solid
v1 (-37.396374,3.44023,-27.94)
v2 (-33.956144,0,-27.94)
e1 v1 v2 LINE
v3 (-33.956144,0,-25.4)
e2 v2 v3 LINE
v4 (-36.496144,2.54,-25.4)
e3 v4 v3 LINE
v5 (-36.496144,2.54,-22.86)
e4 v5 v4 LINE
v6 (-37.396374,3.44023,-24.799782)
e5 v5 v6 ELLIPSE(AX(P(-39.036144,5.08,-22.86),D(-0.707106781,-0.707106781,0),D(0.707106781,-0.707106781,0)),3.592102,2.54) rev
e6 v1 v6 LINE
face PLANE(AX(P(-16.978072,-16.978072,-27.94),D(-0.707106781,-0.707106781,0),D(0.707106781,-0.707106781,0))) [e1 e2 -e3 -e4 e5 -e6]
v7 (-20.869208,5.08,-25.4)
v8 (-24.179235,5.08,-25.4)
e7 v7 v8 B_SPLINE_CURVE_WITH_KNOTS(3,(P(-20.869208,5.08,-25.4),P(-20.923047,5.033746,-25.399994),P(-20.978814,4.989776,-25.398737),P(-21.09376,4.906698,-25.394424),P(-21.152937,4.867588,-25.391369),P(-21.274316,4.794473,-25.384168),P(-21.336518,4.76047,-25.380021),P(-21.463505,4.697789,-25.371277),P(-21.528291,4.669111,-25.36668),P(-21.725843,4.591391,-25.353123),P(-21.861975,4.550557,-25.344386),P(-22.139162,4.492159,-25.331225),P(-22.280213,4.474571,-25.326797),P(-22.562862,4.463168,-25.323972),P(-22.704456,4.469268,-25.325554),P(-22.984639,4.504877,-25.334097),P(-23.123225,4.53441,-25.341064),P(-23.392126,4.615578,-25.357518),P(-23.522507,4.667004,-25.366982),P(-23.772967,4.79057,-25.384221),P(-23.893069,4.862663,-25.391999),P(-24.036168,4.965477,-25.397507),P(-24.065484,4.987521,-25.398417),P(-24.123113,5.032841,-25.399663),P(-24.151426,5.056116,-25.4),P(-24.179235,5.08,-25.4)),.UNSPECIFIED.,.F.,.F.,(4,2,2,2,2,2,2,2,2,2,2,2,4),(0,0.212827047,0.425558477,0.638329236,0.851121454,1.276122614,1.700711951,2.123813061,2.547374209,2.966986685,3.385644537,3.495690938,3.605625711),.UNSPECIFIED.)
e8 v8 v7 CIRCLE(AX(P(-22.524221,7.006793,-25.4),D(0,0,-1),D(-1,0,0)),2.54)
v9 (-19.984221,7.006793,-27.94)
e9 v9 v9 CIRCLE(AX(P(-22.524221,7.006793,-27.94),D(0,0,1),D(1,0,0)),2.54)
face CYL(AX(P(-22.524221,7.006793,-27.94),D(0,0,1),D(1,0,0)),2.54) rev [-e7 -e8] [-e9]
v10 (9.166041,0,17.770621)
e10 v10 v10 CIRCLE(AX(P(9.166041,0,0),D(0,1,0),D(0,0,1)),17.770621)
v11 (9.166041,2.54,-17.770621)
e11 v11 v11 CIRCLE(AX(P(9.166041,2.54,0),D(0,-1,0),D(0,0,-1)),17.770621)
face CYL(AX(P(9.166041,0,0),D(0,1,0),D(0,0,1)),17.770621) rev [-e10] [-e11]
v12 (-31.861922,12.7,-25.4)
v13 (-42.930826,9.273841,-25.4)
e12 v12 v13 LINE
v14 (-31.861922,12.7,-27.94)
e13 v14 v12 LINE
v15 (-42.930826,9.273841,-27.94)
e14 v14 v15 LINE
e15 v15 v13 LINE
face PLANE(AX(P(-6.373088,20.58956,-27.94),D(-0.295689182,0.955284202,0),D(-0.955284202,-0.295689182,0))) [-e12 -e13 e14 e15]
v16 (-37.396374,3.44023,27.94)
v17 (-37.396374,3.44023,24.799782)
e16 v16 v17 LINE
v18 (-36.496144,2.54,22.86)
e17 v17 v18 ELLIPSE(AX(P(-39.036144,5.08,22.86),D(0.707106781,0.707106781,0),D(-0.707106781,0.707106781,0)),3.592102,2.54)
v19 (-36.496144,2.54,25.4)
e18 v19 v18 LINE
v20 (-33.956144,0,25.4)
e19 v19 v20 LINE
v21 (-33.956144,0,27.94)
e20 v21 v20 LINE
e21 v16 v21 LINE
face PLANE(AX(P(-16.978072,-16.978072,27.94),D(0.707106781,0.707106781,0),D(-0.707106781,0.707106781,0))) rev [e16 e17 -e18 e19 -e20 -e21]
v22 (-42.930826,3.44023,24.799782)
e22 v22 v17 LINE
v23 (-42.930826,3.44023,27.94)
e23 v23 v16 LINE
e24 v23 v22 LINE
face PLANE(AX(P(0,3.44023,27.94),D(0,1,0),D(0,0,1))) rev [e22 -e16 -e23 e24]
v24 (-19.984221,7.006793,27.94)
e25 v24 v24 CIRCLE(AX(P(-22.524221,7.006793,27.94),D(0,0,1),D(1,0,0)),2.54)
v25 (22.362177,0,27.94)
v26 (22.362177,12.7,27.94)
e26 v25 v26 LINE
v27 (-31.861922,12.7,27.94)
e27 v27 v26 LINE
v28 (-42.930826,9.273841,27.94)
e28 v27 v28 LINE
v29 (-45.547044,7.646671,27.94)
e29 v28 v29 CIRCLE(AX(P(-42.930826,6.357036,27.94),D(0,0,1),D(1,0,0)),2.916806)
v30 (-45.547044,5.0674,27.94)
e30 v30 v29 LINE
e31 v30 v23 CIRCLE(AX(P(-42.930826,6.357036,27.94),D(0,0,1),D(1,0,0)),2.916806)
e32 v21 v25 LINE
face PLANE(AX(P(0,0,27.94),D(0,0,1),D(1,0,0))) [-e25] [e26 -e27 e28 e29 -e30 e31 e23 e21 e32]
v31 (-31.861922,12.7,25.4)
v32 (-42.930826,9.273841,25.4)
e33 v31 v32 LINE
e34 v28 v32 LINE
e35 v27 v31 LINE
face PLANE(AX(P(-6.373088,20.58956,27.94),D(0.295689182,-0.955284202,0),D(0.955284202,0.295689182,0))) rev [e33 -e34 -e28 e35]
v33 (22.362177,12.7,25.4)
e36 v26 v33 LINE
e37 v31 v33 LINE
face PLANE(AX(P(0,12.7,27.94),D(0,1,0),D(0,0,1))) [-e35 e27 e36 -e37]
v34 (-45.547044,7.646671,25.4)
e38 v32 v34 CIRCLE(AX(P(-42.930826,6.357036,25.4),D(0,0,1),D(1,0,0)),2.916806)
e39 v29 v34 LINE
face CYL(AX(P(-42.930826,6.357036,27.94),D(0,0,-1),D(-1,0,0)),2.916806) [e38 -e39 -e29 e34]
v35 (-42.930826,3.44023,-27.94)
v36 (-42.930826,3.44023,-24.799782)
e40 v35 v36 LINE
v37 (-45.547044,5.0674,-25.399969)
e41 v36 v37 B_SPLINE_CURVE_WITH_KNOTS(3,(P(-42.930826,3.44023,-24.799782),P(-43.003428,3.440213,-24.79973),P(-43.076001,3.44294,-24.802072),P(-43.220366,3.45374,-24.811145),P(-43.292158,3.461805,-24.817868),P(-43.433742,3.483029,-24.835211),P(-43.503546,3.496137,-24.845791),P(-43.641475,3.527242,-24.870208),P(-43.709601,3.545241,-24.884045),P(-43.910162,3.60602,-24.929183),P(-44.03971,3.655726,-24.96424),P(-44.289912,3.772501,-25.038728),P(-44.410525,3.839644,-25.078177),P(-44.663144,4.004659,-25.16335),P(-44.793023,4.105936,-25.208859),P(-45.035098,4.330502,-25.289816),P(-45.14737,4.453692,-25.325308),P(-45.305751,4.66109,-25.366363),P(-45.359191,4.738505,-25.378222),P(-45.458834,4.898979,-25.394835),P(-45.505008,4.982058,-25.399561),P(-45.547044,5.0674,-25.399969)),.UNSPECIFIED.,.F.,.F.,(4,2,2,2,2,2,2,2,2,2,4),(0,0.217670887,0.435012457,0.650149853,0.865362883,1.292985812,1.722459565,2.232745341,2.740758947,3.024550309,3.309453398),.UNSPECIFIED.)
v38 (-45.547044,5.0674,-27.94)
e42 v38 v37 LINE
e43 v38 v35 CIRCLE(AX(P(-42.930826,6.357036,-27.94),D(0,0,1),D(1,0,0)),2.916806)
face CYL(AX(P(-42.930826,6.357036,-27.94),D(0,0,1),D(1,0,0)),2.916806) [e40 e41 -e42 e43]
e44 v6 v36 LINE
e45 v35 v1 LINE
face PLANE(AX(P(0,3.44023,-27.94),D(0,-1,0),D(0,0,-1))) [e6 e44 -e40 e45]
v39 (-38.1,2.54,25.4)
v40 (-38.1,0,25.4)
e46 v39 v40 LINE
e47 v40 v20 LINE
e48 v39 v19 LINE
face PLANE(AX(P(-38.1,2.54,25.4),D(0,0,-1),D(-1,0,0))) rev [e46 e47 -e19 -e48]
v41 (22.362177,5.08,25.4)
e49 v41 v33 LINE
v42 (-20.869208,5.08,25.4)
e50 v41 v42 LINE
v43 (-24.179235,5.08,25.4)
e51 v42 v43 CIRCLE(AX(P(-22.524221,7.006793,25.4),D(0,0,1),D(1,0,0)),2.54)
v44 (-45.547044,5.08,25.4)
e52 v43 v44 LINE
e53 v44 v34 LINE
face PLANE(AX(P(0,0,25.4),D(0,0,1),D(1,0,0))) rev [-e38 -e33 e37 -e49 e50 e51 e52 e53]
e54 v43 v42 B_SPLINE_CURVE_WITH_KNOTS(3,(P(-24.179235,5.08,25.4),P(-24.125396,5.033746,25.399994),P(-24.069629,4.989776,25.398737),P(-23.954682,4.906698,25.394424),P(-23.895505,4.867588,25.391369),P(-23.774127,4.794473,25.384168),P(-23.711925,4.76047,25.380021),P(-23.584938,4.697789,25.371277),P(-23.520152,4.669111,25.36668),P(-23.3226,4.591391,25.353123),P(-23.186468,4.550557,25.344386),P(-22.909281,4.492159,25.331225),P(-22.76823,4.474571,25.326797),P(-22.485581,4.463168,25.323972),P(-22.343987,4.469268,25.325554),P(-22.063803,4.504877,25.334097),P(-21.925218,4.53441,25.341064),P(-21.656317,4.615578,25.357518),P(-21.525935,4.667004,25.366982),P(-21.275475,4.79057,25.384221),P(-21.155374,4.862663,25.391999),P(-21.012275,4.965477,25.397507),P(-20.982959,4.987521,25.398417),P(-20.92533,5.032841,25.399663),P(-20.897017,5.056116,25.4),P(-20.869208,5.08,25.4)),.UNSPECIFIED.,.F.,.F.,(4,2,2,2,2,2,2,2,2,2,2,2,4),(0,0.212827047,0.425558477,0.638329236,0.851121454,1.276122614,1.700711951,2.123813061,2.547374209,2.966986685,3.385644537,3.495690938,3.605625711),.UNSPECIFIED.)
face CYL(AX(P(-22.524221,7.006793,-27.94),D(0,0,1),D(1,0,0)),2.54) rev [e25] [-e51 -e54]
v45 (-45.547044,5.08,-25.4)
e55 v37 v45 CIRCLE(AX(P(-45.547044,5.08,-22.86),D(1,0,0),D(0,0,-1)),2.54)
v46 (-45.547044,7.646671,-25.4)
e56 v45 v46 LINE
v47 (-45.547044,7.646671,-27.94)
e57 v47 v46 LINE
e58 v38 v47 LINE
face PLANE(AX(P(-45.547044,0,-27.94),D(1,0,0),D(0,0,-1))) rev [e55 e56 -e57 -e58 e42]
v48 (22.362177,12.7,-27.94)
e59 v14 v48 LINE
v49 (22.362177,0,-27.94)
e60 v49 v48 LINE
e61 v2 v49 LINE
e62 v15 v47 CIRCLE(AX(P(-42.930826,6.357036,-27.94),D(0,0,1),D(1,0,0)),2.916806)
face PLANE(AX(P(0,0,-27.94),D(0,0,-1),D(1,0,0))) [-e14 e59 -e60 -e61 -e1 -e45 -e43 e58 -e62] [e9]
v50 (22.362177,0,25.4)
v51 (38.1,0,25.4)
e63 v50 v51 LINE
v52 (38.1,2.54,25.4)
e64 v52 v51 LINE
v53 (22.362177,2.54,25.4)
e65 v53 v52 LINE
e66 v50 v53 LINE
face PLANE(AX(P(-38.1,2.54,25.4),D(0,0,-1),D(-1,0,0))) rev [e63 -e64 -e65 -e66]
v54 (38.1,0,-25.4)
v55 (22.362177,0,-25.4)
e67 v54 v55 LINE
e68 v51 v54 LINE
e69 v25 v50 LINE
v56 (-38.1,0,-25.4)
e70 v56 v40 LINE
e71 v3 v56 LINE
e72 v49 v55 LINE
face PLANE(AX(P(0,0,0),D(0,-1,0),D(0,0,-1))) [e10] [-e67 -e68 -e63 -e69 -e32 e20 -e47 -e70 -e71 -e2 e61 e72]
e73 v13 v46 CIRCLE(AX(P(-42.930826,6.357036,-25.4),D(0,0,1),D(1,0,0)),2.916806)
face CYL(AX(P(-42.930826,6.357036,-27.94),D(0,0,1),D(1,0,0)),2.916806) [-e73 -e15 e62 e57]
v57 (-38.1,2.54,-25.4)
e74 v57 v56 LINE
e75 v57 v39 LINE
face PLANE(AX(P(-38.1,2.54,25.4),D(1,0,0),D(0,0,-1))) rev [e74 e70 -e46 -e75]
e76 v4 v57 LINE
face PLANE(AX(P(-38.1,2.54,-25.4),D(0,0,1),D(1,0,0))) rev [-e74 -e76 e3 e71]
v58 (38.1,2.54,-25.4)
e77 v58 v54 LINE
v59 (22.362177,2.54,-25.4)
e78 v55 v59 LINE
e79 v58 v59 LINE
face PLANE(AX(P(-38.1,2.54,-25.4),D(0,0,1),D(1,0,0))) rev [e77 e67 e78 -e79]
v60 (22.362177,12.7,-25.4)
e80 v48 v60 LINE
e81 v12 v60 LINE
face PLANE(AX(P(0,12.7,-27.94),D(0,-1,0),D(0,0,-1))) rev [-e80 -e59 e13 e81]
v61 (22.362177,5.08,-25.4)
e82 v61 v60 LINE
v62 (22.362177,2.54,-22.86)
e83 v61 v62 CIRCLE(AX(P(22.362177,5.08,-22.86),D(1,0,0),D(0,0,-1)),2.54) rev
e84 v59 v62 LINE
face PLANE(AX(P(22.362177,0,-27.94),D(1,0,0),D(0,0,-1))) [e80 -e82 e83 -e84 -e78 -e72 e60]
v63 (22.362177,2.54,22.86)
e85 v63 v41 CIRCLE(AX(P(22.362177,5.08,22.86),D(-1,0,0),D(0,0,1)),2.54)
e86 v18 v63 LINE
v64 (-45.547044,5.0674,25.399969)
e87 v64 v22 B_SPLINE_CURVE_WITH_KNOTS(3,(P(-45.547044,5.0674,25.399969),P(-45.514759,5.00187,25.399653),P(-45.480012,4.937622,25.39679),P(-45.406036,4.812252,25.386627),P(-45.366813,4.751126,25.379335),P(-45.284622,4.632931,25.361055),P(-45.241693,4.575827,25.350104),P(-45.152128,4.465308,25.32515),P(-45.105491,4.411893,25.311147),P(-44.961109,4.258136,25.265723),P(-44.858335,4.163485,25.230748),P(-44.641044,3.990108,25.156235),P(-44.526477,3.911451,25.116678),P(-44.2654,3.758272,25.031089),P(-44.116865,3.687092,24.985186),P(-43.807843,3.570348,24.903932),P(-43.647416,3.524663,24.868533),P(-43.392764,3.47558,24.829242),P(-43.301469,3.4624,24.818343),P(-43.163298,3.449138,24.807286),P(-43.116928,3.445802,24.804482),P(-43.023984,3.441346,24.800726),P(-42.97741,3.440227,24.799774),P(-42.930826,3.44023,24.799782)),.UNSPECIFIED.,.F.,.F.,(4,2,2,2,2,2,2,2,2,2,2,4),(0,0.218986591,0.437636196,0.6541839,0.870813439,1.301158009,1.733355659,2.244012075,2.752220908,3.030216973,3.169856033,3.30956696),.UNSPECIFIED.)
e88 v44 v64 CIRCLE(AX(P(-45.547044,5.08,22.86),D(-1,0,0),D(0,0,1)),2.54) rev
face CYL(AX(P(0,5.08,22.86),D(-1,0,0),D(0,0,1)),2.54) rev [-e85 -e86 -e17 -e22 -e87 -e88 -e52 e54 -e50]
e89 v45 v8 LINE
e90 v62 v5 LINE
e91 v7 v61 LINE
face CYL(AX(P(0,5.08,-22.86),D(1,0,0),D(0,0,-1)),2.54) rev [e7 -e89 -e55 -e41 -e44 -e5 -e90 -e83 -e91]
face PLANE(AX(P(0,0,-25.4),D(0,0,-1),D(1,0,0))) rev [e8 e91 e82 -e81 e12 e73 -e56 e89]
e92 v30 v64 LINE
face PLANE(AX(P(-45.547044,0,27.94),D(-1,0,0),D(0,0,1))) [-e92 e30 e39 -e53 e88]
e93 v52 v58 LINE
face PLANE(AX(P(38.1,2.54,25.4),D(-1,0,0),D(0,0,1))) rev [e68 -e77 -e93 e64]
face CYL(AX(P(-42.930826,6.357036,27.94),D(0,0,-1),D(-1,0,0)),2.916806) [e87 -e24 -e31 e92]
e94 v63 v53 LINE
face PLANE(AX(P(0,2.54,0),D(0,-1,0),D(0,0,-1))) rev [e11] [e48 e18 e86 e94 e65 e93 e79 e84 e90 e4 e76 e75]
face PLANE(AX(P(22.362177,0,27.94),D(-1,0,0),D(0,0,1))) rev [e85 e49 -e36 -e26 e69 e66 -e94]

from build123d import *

# Parameters (mm, degrees)
SKETCH1_W               = 76.2
SKETCH1_H               = 50.8
BOSS_EXTRUDE1_DEPTH     = 2.54
BOSS_EXTRUDE3_DEPTH     = 2.54
FILLET1_START           = -37.396373698
FILLET1_DEPTH           = 59.758551136
FILLET1_START_2         = -45.547043779
FILLET1_2_DEPTH         = 8.279361144
FILLET1_START_3         = 22
FILLET1_3_DEPTH         = 3.4
FILLET2_START           = -42.930825639
FILLET2_DEPTH           = 65.293003077
FILLET2_START_2         = -37.396373698
FILLET2_2_DEPTH         = 59.758551136
FILLET2_START_3         = -45.547043779
FILLET2_3_DEPTH         = 2.61621814
FILLET2_START_4         = -25.4
FILLET2_4_DEPTH         = 3.4
CUT_EXTRUDE1_DEPTH      = 74.201076537
CUT_EXTRUDE1_DEPTH_BACK = 74.201076537
SKETCH3_R               = 2.54
CUT_EXTRUDE2_DEPTH      = 55.391197925
CUT_EXTRUDE2_DEPTH_BACK = 55.391197925
SKETCH4_R               = 17.770620532


with BuildPart() as part:
    # Sketch1 → Boss-Extrude1 (new body)
    with BuildSketch(Plane(origin=(0, 0, 0), x_dir=(1, 0, 0), z_dir=(0, 1, 0))):
        Rectangle(SKETCH1_W, SKETCH1_H)
    extrude(amount=BOSS_EXTRUDE1_DEPTH)

    # Sketch2 → Boss-Extrude3 (add)
    with BuildSketch(Plane.XY.offset(25.4)):
        Polygon((22.362177438, 0), (22.362177438, 2.54), (-36.496143753, 2.54), (-33.956143753, 0), align=None)
        with BuildLine():
            Line((22.362177438, 12.7), (-31.861921757, 12.7))
            Line((-31.861921757, 12.7), (-42.930825639, 9.27384145))
            ThreePointArc((-42.930825639, 9.27384145), (-44.471302904, 8.833865445), (-45.547043679, 7.646670905))
            Line((-45.547043679, 7.646670905), (-45.547043679, 5.06740049))
            ThreePointArc((-45.547043679, 5.06740049), (-44.471302904, 3.88020595), (-42.930825639, 3.440229945))
            Line((-42.930825639, 3.440229945), (-37.396373698, 3.440229945))
            Line((-37.396373698, 3.440229945), (-36.496143753, 2.54))
            Line((-36.496143753, 2.54), (22.362177438, 2.54))
            Line((22.362177438, 2.54), (22.362177438, 12.7))
        make_face()
    boss_extrude3 = extrude(amount=BOSS_EXTRUDE3_DEPTH)

    # Fillet1: read off the stored shape, not the designer's step
    # Fillet1 outline → Fillet1 (add)
    with BuildSketch(Plane.YZ.offset(FILLET1_START)):
        with BuildLine():
            ThreePointArc((2.54, 22.86), (3.283948776, 24.656051224), (5.08, 25.4))
            Line((5.08, 25.4), (2.54, 25.4))
            Line((2.54, 25.4), (2.54, 22.86))
        make_face()
    extrude(amount=FILLET1_DEPTH)

    # Fillet1 2 outline → Fillet1 2 (add)
    with BuildSketch(Plane.YZ.offset(FILLET1_START_2)):
        with BuildLine():
            Line((3.440229945, 25.4), (3.440229945, 24.799781989))
            ThreePointArc((3.440229945, 24.799781989), (4.206915311, 25.245230204), (5.08, 25.4))
            Line((5.08, 25.4), (3.440229945, 25.4))
        make_face()
    extrude(amount=FILLET1_2_DEPTH)

    # Fillet1 3 outline → Fillet1 3 (cut)
    with BuildSketch(Plane.XY.offset(FILLET1_START_3)):
        with BuildLine():
            Line((-45.547043779, 3.440229945), (-42.930825639, 3.440229945))
            ThreePointArc((-42.930825639, 3.440229945), (-44.471302904, 3.88020595), (-45.547043679, 5.06740049))
            Line((-45.547043679, 5.06740049), (-45.547043779, 3.440229945))
        make_face()
        Polygon((-36.496143753, 2.54), (-37.396373698, 3.440229945), (-37.396373698, 2.54), align=None)
    extrude(amount=FILLET1_3_DEPTH, mode=Mode.SUBTRACT)

    # Mirror1: Boss-Extrude3 across plane
    add(boss_extrude3.mirror(Plane.XY))

    # Fillet2: read off the stored shape, not the designer's step
    # Fillet2 outline → Fillet2 (add)
    with BuildSketch(Plane.YZ.offset(FILLET2_START)):
        with BuildLine():
            ThreePointArc((5.08, -25.4), (4.206915311, -25.245230204), (3.440229945, -24.799781989))
            Line((3.440229945, -24.799781989), (3.440229945, -25.4))
            Line((3.440229945, -25.4), (5.08, -25.4))
        make_face()
    extrude(amount=FILLET2_DEPTH)

    # Fillet2 2 outline → Fillet2 2 (add)
    with BuildSketch(Plane.YZ.offset(FILLET2_START_2)):
        with BuildLine():
            ThreePointArc((3.440229945, -24.799781989), (2.776023444, -23.929248348), (2.54, -22.86))
            Line((2.54, -22.86), (2.54, -25.4))
            Line((2.54, -25.4), (3.440229945, -25.4))
            Line((3.440229945, -25.4), (3.440229945, -24.799781989))
        make_face()
    extrude(amount=FILLET2_2_DEPTH)

    # Fillet2 3 outline → Fillet2 3 (add)
    with BuildSketch(Plane.YZ.offset(FILLET2_START_3)):
        with BuildLine():
            ThreePointArc((5.08, -25.4), (4.206915311, -25.245230204), (3.440229945, -24.799781989))
            Line((3.440229945, -24.799781989), (3.440229945, -25.4))
            Line((3.440229945, -25.4), (5.08, -25.4))
        make_face()
    extrude(amount=FILLET2_3_DEPTH)

    # Fillet2 4 outline → Fillet2 4 (cut)
    with BuildSketch(Plane.XY.offset(FILLET2_START_4)):
        Polygon((-36.496143753, 2.54), (-37.396373698, 3.440229945), (-37.396373698, 2.54), align=None)
        with BuildLine():
            ThreePointArc((-42.930825639, 3.440229945), (-44.471302904, 3.88020595), (-45.547043679, 5.06740049))
            Line((-45.547043679, 5.06740049), (-45.547043779, 3.440229945))
            Line((-45.547043779, 3.440229945), (-42.930825639, 3.440229945))
        make_face()
    extrude(amount=FILLET2_4_DEPTH, mode=Mode.SUBTRACT)

    # Sketch3 → Cut-Extrude1 (cut, two sides: drawn at the far end of the back side and taken through both)
    with BuildSketch(Plane.XY.offset(27.94).offset(-CUT_EXTRUDE1_DEPTH_BACK)):
        with Locations((-22.524221352, 7.006792996)):
            Circle(SKETCH3_R)
    extrude(amount=CUT_EXTRUDE1_DEPTH + CUT_EXTRUDE1_DEPTH_BACK, mode=Mode.SUBTRACT)

    # Sketch4 → Cut-Extrude2 (cut, two sides: drawn at the far end of the back side and taken through both)
    with BuildSketch(Plane(origin=(0, 2.54, 0), x_dir=(1, 0, 0), z_dir=(0, 1, 0)).offset(-CUT_EXTRUDE2_DEPTH_BACK)):
        with Locations(Location((9.166040708, 0, 0), (0, 0, 270))):
            Circle(SKETCH4_R)
    extrude(amount=CUT_EXTRUDE2_DEPTH + CUT_EXTRUDE2_DEPTH_BACK, mode=Mode.SUBTRACT)


solid = part.part
